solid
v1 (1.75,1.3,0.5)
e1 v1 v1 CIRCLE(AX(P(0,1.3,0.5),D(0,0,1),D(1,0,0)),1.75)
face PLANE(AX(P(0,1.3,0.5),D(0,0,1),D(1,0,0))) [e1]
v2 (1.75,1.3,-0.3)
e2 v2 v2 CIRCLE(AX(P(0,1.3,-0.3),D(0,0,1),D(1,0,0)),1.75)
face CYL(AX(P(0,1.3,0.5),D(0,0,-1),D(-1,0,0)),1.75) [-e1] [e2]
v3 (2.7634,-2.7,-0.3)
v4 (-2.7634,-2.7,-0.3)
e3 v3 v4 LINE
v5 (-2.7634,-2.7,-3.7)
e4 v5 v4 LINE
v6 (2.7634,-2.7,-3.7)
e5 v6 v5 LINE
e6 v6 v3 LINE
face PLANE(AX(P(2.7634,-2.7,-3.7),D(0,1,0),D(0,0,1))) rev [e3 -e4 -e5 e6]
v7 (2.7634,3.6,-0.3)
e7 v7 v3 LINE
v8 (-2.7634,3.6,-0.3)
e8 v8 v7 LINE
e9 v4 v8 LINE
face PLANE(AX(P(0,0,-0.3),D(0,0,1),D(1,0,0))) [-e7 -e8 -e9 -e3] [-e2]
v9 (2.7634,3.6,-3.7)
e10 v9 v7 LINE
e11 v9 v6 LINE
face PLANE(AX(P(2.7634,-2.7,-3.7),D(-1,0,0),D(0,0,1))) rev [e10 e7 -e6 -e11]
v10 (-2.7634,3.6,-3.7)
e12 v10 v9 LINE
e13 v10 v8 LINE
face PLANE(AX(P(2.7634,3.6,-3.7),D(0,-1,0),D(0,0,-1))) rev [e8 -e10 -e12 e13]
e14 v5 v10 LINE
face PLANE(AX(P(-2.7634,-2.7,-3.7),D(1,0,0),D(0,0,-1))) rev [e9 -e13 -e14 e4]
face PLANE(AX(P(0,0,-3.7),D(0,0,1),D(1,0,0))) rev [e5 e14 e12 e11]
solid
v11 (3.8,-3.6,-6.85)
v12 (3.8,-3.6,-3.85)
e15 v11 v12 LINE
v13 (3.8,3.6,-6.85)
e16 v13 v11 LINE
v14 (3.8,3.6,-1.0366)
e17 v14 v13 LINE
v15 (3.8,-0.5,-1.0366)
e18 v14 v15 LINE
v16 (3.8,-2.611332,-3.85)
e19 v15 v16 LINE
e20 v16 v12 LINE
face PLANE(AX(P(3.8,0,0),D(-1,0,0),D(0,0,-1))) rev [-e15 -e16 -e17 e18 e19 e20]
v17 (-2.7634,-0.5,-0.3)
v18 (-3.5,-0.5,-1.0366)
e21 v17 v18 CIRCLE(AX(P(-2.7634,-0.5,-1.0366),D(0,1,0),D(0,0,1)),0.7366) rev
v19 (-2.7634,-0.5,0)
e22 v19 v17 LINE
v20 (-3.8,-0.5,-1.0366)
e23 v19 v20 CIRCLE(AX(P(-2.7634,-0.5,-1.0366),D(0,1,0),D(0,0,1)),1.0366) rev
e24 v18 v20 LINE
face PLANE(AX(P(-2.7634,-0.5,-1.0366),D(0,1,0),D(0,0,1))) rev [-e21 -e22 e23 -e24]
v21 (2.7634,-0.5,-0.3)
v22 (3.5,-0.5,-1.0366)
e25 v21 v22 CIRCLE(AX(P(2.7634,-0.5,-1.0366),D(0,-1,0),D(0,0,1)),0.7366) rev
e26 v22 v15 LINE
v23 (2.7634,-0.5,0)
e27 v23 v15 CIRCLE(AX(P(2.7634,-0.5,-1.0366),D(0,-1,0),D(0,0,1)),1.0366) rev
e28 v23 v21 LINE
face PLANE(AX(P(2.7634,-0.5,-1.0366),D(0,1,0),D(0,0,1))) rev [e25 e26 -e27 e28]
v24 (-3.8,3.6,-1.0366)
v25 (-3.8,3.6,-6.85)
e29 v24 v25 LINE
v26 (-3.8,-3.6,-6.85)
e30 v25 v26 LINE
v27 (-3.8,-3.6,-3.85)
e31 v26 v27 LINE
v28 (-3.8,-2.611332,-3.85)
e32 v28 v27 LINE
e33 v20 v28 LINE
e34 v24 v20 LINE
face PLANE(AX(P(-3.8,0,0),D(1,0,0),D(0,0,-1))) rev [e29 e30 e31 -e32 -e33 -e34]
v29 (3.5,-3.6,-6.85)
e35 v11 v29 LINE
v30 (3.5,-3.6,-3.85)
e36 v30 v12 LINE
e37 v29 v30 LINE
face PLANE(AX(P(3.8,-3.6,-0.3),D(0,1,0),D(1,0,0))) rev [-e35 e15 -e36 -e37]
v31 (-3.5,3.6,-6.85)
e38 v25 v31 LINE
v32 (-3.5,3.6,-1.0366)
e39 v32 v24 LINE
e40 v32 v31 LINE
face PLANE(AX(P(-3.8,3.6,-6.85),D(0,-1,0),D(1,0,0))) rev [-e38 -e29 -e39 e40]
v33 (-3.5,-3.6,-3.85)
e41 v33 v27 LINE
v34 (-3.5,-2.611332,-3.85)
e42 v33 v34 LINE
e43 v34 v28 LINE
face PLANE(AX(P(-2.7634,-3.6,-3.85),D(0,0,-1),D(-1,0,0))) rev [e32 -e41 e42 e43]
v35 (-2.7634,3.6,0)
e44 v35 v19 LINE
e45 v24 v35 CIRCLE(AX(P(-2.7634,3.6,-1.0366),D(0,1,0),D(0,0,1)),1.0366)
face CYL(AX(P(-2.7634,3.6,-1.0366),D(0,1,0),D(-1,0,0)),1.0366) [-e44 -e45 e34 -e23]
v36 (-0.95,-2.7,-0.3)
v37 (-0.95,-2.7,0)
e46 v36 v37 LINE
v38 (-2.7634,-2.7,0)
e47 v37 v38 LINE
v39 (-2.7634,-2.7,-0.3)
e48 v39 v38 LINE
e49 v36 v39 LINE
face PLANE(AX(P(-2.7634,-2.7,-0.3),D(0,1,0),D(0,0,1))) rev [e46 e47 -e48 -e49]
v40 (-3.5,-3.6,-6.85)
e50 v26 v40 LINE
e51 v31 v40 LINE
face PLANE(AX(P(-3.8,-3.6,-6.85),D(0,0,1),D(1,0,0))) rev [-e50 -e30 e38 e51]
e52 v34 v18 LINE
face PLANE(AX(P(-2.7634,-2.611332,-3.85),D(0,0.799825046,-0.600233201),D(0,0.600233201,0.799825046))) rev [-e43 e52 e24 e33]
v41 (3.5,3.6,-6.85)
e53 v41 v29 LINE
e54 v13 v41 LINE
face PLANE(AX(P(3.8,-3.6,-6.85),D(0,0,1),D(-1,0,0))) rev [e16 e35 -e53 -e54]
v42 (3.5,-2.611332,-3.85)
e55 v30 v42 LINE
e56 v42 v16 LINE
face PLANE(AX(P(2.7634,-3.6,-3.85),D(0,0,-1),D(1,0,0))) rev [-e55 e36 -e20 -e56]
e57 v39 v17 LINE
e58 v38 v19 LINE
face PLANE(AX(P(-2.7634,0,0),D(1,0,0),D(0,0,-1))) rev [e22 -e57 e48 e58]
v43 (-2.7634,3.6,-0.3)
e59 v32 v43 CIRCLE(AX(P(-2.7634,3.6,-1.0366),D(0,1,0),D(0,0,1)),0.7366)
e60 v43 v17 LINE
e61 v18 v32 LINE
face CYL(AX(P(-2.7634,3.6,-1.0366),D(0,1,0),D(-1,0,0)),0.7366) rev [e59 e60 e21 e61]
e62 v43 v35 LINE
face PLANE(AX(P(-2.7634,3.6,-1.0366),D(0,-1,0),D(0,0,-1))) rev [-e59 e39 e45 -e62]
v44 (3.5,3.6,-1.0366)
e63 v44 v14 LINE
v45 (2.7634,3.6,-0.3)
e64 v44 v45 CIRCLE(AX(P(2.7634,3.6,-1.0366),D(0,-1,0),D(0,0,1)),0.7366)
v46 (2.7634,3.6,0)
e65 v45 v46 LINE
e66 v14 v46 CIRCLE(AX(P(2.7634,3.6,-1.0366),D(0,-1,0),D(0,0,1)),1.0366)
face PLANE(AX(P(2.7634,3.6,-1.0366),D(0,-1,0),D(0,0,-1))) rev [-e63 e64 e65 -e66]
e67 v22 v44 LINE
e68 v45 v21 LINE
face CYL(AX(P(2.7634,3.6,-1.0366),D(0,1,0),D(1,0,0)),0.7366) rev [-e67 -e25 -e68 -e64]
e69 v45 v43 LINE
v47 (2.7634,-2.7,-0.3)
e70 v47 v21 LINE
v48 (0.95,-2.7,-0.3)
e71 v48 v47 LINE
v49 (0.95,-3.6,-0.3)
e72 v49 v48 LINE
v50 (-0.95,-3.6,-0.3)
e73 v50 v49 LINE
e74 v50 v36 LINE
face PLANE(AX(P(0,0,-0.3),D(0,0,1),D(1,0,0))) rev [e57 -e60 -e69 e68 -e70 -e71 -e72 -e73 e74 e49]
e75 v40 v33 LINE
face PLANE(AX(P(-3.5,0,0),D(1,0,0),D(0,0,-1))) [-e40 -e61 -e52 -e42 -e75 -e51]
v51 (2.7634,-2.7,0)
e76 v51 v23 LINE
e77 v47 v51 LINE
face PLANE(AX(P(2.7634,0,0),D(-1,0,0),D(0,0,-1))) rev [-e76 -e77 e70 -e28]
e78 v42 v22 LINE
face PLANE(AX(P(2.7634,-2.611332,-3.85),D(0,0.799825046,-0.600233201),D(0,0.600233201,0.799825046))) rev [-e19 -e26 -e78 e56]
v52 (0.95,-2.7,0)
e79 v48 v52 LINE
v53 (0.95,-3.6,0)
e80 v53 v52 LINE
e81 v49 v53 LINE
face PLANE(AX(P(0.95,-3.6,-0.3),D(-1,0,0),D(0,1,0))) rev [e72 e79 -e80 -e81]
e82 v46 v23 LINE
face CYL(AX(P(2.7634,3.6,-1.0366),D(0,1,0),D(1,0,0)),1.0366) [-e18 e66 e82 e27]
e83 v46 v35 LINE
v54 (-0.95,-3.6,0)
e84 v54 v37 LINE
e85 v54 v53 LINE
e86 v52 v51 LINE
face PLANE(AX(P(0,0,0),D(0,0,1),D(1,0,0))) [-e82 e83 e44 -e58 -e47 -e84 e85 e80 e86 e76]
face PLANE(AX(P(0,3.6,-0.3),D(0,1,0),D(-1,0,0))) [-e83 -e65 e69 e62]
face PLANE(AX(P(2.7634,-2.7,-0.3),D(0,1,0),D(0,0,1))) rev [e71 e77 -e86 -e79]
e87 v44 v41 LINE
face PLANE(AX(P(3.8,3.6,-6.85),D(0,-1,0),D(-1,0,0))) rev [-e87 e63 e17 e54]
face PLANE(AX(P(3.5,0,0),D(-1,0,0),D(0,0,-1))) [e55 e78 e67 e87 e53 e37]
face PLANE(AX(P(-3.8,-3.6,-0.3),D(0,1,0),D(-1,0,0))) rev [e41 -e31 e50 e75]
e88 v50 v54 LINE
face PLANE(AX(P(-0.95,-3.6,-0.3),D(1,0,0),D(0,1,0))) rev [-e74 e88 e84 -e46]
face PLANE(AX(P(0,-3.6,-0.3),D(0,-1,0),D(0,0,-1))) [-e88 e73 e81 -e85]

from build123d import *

# Parameters (mm, degrees)
SKETCH4_W                    = 3.8
SKETCH4_H                    = 7.2
BASE_FLANGE1_DEPTH           = 0.3
EDGE_FLANGE2_STRIP_W         = 2.6732
EDGE_FLANGE2_STRIP_H         = 0.3
EDGE_FLANGE2_STRIP_CUT_DEPTH = 7.2
EDGE_FLANGE2_DEPTH           = 7.2
SKETCH13_W                   = 1.8134
SKETCH13_H                   = 0.9
CUT_EXTRUDE1_DEPTH           = 0.3
CUT_EXTRUDE3_DEPTH           = 1.0366
SKETCH17_W                   = 5.5268
SKETCH17_H                   = 6.3
BOSS_EXTRUDE3_DEPTH          = 3.4
SKETCH18_R                   = 1.75
BOSS_EXTRUDE4_DEPTH          = 0.8


# Sheet-metal steps are written as plain solids
with BuildPart() as part:
    # Sketch4 → Base-Flange1 (new body)
    with BuildSketch(Plane.XY):
        with Locations((-1.9, 0)):
            Rectangle(SKETCH4_W, SKETCH4_H)
    extrude(amount=-BASE_FLANGE1_DEPTH)

    # Edge-Flange2 strip (across the edge) → Edge-Flange2 strip cut (cut)
    with BuildSketch(Plane(origin=(-3.8, -3.6, -0.3), x_dir=(1, 0, 0), z_dir=(0, 1, 0))):
        with Locations((-0.3, -0.15)):
            Rectangle(EDGE_FLANGE2_STRIP_W, EDGE_FLANGE2_STRIP_H)
    extrude(amount=EDGE_FLANGE2_STRIP_CUT_DEPTH, mode=Mode.SUBTRACT)

    # Edge-Flange2 section (across the edge) → Edge-Flange2 (add)
    with BuildSketch(Plane(origin=(-3.8, -3.6, -0.3), x_dir=(1, 0, 0), z_dir=(0, 1, 0))):
        with BuildLine():
            Line((0, 0.7366), (0, 6.55))
            Line((0, 6.55), (0.3, 6.55))
            Line((0.3, 6.55), (0.3, 0.7366))
            ThreePointArc((0.3, 0.7366), (0.515745145, 0.215745145), (1.0366, 0))
            Line((1.0366, 0), (1.0366, -0.3))
            ThreePointArc((1.0366, -0.3), (0.303613111, 0.003613111), (0, 0.7366))
        make_face()
    extrude(amount=EDGE_FLANGE2_DEPTH)

    # Sketch13 → Cut-Extrude1 (cut)
    with BuildSketch(Plane.XY):
        with Locations((-1.8567, -3.15)):
            Rectangle(SKETCH13_W, SKETCH13_H)
    extrude(amount=-CUT_EXTRUDE1_DEPTH, mode=Mode.SUBTRACT)

    # Sketch14 → Cut-Extrude3 (cut)
    with BuildSketch(Plane.ZY.offset(3.8)):
        Polygon((0, -0.5), (0, -3.6), (-3.85, -3.6), (-3.85, -2.611331844), (-1.0366, -0.5), align=None)
    extrude(amount=-CUT_EXTRUDE3_DEPTH, mode=Mode.SUBTRACT)

    # Mirror3: part across plane


with BuildPart() as part_1:
    add(part.part)
    add(part.part.mirror(Plane(origin=(0, -3.6, -0.3), x_dir=(0, 0, 1), z_dir=(1, 0, 0))))


with BuildPart() as body_2:
    # Sketch17 → Boss-Extrude3 (new body)
    with BuildSketch(Plane(origin=(0, 0, -0.3), x_dir=(-1, 0, 0), z_dir=(0, 0, -1))):
        with Locations((0, 0.45)):
            Rectangle(SKETCH17_W, SKETCH17_H)
    extrude(amount=BOSS_EXTRUDE3_DEPTH)

    # Sketch18 → Boss-Extrude4 (add)
    with BuildSketch(Plane.XY.offset(-0.3)):
        with Locations((0, 1.3)):
            Circle(SKETCH18_R)
    extrude(amount=BOSS_EXTRUDE4_DEPTH)


solid = Compound([part_1.part, body_2.part])
